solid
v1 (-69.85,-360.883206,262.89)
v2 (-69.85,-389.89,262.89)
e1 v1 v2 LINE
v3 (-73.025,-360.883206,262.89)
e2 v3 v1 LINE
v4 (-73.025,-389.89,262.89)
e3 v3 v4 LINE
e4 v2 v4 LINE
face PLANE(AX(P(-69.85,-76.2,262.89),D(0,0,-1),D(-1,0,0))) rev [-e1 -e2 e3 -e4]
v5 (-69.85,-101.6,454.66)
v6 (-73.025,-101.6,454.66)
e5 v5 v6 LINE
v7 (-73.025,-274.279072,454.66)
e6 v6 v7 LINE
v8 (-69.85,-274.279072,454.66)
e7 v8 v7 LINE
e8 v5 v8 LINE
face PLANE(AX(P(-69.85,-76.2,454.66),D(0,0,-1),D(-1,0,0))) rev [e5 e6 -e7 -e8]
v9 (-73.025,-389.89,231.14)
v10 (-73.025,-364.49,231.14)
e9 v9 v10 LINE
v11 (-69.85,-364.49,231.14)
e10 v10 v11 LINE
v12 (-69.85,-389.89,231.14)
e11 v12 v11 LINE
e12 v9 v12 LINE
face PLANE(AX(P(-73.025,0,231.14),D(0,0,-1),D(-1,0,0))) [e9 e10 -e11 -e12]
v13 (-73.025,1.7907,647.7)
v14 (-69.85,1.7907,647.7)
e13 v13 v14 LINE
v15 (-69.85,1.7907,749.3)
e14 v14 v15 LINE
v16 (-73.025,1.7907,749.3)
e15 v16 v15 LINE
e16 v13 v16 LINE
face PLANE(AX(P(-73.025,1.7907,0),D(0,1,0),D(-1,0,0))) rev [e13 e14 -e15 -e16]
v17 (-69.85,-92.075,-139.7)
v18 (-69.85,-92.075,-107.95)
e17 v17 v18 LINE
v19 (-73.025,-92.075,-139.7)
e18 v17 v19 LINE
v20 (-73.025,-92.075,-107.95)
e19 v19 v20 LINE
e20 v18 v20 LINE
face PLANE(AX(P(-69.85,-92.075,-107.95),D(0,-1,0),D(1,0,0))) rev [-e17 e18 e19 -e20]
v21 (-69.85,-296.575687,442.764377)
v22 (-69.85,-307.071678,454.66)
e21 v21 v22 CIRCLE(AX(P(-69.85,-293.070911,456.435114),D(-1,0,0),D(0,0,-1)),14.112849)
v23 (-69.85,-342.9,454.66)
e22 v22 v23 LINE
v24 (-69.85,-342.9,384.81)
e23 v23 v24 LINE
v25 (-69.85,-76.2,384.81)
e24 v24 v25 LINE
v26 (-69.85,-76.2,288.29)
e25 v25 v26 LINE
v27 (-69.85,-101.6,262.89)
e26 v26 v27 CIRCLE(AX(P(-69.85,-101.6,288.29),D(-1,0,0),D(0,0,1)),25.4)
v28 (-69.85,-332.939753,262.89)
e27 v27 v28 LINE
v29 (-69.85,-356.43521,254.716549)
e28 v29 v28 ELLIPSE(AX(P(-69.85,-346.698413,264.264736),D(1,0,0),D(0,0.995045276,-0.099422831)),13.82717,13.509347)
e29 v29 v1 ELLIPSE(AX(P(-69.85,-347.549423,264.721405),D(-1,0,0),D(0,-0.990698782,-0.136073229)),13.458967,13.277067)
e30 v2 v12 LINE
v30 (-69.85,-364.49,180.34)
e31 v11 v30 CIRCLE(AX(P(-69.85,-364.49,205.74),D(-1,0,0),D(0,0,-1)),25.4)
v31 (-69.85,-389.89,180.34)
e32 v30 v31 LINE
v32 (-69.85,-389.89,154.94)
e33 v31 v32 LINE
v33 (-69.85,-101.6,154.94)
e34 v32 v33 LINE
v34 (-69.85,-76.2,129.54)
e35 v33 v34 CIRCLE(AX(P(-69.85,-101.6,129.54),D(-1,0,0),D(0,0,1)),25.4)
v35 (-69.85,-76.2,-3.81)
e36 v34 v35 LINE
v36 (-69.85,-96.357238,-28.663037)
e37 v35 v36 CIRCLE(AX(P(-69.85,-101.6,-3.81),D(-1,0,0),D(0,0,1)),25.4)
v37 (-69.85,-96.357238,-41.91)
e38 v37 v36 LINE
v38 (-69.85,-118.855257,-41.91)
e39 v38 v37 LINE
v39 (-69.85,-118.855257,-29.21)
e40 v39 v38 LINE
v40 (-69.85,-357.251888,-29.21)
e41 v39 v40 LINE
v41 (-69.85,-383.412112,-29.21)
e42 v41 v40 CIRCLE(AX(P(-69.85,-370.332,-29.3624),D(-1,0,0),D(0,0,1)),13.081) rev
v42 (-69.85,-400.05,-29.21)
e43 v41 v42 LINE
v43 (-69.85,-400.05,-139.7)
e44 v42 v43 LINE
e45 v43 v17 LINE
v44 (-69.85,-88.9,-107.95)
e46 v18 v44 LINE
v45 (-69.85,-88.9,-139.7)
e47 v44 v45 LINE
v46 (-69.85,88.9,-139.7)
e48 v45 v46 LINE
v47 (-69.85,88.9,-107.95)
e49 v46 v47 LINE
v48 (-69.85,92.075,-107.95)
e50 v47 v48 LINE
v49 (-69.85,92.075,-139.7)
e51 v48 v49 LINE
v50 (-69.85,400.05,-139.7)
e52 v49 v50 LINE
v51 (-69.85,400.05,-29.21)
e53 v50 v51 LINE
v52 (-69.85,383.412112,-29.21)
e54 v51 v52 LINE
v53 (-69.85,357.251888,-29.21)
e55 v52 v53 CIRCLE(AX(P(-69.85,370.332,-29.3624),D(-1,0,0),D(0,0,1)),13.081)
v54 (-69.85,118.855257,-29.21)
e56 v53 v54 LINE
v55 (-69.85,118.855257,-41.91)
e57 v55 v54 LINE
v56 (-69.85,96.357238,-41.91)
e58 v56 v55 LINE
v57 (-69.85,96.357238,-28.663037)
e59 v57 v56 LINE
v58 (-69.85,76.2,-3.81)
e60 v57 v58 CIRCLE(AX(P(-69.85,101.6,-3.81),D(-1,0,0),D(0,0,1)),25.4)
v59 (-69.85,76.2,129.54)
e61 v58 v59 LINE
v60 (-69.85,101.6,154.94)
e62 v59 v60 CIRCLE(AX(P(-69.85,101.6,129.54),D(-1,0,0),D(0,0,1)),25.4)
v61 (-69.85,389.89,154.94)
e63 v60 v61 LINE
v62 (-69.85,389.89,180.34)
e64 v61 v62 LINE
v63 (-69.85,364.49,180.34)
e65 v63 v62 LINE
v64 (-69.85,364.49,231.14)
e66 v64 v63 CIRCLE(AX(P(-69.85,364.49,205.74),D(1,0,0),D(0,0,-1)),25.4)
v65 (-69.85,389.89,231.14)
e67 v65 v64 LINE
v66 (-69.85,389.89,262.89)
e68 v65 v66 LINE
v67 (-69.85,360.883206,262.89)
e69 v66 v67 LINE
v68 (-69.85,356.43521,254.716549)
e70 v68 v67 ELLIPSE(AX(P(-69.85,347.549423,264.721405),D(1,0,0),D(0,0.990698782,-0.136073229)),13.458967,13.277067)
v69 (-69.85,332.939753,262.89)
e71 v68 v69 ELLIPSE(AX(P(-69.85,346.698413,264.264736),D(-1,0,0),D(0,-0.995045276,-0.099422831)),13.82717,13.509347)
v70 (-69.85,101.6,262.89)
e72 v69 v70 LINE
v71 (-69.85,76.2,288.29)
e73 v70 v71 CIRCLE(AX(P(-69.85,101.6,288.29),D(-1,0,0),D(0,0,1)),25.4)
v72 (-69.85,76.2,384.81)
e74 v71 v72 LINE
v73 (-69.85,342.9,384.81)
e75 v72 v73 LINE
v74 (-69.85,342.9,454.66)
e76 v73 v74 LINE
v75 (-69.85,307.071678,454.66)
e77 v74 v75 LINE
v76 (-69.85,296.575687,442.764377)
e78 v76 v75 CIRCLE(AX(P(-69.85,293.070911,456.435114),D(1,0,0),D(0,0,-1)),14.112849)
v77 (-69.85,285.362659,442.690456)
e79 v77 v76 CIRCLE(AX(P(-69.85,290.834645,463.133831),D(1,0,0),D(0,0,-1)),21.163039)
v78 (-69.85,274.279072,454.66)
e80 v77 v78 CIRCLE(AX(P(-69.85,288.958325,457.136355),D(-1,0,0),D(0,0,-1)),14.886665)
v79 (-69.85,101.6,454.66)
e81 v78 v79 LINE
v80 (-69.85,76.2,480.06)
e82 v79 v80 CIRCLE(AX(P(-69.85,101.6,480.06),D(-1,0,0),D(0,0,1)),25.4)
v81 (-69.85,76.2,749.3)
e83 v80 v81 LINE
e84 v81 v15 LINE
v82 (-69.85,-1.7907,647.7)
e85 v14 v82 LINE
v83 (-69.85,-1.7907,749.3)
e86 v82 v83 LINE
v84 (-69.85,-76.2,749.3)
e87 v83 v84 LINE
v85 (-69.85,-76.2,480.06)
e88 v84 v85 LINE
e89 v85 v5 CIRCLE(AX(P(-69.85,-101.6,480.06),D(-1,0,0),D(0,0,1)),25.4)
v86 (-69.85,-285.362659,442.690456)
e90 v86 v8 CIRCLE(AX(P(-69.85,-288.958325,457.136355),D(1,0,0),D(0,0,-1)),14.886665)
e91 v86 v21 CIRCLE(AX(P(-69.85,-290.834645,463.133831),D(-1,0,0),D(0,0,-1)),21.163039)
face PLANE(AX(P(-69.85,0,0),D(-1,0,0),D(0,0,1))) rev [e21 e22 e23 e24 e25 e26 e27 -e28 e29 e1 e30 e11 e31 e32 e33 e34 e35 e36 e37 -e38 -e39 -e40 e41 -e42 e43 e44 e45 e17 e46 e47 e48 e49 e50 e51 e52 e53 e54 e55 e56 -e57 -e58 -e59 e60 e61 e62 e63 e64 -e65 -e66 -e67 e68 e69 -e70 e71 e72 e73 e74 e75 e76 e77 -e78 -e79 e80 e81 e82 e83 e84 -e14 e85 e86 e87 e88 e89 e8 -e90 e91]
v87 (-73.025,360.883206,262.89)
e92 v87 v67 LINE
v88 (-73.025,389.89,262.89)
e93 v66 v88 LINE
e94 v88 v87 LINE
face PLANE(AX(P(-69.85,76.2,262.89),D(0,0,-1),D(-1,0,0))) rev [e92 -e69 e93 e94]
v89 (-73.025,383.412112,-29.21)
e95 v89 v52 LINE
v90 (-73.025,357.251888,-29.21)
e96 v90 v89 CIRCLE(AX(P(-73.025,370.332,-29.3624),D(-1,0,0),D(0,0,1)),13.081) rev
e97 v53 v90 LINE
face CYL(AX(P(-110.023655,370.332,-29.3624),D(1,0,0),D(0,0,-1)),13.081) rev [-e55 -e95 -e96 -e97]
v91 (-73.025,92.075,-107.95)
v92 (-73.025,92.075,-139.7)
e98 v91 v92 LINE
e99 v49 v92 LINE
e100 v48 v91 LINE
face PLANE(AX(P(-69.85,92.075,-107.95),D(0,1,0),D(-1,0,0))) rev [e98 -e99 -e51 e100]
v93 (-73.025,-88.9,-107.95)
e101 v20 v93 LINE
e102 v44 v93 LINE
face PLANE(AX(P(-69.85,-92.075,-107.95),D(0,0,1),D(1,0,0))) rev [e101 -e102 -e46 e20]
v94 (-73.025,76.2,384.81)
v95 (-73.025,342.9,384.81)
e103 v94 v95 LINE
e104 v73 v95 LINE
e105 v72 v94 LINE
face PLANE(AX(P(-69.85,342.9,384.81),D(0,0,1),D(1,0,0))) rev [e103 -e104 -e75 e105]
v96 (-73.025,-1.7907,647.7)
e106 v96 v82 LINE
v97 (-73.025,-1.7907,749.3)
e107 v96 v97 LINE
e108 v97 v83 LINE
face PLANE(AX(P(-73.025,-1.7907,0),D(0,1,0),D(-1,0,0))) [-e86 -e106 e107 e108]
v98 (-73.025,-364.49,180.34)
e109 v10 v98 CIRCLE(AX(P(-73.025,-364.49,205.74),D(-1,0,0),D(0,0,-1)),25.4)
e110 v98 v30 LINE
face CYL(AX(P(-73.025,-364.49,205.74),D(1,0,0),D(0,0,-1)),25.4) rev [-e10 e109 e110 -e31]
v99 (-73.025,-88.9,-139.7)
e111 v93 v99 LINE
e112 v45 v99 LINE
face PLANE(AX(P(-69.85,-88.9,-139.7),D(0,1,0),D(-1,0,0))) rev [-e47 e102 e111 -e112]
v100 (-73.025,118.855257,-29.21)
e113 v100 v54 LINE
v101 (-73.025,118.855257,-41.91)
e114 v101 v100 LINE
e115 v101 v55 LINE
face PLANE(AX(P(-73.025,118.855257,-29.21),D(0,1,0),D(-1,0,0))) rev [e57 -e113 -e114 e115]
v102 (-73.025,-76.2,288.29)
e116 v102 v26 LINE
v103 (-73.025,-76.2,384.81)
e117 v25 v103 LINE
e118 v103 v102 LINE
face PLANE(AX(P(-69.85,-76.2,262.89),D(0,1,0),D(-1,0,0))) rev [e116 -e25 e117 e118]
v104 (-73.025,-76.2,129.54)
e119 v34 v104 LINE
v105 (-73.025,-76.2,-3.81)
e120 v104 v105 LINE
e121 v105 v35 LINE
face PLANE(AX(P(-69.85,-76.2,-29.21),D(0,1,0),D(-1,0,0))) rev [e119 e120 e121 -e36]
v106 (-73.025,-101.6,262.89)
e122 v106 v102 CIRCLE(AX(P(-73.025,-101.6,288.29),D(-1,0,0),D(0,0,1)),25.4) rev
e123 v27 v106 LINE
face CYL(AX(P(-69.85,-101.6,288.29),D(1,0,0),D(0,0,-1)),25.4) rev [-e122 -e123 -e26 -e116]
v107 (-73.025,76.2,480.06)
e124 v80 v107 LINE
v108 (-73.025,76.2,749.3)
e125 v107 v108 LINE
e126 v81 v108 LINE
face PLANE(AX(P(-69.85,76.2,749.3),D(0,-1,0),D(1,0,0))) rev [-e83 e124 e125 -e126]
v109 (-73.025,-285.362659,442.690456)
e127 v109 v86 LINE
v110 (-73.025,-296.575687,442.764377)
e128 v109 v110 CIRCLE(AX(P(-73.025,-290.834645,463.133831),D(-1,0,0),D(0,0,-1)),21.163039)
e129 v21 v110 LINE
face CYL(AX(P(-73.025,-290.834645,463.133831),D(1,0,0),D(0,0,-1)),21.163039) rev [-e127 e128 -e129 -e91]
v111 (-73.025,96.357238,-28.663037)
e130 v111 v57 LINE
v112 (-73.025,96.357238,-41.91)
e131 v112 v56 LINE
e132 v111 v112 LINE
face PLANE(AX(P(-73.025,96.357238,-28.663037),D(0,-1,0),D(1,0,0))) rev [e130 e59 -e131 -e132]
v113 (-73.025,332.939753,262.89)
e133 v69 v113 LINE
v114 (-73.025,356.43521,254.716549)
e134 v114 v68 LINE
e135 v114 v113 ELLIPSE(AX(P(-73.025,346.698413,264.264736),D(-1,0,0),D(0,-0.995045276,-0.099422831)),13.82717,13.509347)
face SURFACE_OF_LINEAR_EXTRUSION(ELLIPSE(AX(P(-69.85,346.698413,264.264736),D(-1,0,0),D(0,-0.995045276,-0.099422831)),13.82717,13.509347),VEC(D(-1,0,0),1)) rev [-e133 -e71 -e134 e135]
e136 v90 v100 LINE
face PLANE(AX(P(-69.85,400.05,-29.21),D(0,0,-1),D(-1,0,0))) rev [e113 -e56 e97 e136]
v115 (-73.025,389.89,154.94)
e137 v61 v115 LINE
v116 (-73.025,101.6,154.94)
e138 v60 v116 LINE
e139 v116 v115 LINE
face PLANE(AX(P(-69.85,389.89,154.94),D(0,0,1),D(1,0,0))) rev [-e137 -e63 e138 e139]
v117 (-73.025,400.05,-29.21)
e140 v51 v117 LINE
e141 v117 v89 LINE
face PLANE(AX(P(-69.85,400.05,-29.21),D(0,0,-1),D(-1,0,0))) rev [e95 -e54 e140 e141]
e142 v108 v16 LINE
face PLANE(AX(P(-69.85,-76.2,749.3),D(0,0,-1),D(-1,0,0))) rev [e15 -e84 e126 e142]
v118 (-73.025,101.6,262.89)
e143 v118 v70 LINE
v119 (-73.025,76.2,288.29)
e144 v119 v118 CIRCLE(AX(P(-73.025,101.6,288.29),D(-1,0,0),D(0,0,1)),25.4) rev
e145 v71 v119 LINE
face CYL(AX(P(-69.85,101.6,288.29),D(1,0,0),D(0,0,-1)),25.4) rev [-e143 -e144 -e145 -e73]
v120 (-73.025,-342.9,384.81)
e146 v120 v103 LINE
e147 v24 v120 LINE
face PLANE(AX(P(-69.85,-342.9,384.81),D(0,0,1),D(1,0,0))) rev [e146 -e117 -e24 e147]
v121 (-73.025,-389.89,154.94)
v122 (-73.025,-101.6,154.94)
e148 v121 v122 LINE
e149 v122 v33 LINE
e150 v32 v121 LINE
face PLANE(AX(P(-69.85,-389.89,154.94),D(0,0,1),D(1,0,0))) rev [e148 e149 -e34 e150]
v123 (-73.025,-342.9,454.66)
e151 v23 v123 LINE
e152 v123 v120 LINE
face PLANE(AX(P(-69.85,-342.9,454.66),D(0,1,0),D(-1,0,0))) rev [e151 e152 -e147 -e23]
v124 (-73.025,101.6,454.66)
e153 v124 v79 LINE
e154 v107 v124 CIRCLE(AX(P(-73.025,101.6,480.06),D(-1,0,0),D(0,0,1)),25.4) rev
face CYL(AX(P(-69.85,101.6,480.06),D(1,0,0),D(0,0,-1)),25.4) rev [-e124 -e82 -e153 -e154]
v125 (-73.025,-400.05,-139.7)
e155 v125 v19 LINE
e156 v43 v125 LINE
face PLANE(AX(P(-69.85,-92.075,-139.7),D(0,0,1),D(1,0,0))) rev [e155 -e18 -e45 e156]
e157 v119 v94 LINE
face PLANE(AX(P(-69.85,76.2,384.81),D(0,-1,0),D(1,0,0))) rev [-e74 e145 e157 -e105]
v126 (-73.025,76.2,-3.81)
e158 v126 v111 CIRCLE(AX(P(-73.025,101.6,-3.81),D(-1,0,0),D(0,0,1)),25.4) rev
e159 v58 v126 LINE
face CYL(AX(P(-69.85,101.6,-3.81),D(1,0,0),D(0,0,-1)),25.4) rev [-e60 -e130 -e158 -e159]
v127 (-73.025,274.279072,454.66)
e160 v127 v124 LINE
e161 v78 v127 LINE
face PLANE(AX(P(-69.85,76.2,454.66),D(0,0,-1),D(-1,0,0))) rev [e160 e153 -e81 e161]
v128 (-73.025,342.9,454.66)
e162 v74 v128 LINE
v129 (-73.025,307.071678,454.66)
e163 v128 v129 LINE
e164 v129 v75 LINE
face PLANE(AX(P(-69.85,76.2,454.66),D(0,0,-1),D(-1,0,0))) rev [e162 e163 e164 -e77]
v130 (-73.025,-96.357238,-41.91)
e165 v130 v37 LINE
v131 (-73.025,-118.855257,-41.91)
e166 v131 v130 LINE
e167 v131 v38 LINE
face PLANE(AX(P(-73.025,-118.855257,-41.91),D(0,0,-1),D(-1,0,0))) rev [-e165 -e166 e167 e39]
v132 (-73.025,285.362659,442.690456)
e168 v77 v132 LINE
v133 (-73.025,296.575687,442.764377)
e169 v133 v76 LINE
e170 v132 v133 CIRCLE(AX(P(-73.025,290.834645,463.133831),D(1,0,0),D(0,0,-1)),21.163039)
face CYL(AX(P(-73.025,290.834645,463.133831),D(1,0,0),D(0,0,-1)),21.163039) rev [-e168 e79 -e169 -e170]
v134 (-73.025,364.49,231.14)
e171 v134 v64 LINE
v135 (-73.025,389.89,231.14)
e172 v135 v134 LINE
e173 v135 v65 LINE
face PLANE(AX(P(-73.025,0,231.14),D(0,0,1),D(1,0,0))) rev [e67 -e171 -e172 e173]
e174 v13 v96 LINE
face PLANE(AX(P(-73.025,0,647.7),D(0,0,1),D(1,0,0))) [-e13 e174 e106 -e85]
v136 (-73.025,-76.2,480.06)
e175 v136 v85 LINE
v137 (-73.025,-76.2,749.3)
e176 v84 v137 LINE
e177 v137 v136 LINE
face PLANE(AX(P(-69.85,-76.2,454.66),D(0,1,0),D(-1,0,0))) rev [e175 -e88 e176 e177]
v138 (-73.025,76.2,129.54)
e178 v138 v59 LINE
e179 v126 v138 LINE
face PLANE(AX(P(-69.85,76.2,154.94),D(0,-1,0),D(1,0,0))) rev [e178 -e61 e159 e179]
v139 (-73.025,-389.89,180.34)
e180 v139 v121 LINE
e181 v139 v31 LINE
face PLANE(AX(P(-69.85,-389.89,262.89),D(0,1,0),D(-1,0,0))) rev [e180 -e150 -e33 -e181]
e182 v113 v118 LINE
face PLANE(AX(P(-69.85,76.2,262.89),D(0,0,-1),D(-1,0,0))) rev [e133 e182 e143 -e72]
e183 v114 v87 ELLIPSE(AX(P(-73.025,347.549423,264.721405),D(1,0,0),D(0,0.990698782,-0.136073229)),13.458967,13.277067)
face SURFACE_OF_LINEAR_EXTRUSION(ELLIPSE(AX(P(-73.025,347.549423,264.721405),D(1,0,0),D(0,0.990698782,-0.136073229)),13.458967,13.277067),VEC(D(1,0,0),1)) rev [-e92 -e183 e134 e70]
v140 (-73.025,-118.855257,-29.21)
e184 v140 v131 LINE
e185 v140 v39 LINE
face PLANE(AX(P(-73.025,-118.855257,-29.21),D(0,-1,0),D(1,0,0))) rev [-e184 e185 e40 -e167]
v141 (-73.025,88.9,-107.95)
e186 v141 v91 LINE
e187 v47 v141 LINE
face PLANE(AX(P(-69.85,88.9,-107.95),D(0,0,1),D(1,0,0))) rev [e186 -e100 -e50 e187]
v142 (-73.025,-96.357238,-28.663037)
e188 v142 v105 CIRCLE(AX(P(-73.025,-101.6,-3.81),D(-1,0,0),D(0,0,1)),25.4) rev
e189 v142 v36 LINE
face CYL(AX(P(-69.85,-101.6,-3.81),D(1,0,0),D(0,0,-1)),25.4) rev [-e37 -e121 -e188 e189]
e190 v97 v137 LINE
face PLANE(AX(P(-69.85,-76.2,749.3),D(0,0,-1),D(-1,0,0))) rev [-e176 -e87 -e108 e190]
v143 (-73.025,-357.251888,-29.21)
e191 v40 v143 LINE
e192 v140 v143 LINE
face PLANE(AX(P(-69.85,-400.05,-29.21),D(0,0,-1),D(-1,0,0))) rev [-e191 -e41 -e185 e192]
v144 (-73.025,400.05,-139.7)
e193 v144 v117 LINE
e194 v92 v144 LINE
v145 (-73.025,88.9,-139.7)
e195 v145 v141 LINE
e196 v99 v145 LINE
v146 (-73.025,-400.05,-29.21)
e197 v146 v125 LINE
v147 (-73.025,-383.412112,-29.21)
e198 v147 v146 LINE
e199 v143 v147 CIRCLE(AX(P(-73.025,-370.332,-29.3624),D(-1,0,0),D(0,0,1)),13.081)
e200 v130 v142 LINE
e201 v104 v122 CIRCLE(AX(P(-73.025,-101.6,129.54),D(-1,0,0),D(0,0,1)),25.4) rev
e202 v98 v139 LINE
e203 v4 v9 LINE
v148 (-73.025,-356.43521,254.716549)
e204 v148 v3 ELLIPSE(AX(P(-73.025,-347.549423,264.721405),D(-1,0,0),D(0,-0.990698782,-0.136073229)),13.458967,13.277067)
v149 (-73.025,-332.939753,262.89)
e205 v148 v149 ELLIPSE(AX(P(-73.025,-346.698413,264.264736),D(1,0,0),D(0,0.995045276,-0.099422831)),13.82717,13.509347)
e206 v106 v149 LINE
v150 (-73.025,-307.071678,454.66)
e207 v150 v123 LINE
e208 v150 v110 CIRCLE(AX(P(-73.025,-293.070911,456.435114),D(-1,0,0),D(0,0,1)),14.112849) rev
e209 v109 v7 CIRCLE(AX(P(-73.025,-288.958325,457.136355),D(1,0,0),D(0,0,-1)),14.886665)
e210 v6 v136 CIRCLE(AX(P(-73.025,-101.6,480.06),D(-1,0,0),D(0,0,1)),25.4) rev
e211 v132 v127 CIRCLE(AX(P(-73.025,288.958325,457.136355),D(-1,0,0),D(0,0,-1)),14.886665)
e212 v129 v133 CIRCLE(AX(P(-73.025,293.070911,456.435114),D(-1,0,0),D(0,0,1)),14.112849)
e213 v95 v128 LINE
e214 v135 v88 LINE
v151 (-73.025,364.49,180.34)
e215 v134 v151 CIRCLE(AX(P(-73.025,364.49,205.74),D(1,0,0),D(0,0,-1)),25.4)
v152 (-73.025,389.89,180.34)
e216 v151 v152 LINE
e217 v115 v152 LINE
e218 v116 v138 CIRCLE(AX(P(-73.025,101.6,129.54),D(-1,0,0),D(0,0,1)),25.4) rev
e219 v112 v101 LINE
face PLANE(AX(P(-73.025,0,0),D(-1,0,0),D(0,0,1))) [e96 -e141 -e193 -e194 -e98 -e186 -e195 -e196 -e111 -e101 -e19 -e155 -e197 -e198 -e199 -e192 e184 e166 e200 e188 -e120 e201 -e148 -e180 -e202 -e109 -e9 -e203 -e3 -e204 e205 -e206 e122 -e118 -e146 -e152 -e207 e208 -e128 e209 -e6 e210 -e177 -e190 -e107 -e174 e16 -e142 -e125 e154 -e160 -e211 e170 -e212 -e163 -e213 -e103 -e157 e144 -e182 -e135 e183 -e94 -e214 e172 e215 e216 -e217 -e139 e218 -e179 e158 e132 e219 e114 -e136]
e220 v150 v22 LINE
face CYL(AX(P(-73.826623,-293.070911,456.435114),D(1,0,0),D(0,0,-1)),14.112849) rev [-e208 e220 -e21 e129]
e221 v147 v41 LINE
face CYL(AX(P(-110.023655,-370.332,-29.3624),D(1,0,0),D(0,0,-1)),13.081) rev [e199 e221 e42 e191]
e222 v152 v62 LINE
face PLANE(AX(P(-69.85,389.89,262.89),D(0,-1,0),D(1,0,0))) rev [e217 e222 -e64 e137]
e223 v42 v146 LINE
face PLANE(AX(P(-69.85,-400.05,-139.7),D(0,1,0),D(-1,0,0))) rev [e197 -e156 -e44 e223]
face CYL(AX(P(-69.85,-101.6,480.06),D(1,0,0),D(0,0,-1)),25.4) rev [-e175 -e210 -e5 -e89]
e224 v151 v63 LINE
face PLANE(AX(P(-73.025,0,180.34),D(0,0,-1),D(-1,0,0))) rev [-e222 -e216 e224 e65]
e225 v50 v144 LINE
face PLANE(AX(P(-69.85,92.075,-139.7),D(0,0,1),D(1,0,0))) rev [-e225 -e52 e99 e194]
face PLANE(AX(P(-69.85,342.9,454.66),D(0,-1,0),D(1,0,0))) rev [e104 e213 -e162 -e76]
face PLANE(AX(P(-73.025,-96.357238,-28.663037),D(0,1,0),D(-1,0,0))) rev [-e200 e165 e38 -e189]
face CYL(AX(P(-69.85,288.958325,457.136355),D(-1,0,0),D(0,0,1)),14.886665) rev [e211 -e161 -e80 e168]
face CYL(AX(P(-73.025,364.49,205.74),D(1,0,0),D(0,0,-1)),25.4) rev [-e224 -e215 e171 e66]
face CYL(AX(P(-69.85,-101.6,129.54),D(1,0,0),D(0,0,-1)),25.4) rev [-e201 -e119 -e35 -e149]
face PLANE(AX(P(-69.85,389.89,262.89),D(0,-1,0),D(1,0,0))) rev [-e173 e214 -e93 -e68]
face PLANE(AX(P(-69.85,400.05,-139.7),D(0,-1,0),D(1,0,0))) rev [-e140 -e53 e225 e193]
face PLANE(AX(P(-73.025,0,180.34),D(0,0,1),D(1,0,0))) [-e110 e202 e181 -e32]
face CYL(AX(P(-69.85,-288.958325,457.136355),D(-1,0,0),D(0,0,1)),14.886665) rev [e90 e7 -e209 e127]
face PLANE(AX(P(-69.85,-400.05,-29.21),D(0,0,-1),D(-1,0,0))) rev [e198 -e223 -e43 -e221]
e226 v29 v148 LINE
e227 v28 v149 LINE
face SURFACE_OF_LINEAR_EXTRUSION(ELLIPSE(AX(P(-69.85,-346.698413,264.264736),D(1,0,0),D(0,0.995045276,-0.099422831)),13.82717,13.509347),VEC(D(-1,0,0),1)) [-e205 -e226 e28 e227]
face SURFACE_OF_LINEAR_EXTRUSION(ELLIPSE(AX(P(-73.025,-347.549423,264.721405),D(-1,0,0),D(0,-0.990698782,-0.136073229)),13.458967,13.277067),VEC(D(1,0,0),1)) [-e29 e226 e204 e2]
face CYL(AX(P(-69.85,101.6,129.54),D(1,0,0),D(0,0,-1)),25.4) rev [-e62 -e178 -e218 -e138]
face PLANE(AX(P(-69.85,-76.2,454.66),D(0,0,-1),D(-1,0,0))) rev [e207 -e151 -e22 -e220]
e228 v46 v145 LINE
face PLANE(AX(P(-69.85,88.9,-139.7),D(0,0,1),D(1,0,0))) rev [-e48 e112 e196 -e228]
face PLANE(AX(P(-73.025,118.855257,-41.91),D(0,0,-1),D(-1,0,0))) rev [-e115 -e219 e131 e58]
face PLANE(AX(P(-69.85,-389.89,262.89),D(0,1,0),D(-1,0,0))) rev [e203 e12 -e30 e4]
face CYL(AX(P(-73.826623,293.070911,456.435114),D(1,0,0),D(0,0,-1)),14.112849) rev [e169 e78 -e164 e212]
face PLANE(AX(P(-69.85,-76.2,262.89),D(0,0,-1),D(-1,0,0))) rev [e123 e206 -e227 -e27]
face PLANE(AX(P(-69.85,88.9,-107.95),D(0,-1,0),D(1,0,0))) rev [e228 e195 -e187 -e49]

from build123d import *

# Parameters (mm, degrees)
BOSS_EXTRUDE1_DEPTH = 1.5875
SKETCH2_R           = 13.081
CUT_EXTRUDE1_DEPTH  = 282.7782
CUT_EXTRUDE2_REACH  = 907.396
SKETCH3_R           = 13.081
SKETCH5_RX          = 13.458967046
SKETCH5_RY          = 13.27706685
CUT_EXTRUDE3_DEPTH  = 850.411898389
SKETCH7_RX          = 13.827169688
SKETCH7_RY          = 13.509347203
CUT_EXTRUDE4_DEPTH  = 850.411898525
SURFACECUT1_ANGLE   = 12.730551
CUT_EXTRUDE13_DEPTH = 850.411898527
CUT_EXTRUDE14_START = -3.175
CUT_EXTRUDE14_DEPTH = 3.175
CUT_EXTRUDE15_DEPTH = 850.411898527
CUT_EXTRUDE16_DEPTH = 850.411898527
FILLET1_R           = 25.4
SKETCH28_W          = 101.6
SKETCH28_H          = 1.7907
CUT_EXTRUDE17_DEPTH = 850.411898527
CUT_EXTRUDE18_DEPTH = 850.411898527
CUT_EXTRUDE19_DEPTH = 850.411898527


# Read off the part's stored shape, not the designer's step: SurfaceCut1, Cut-Extrude14
with BuildPart() as part:
    # Sketch1 → Boss-Extrude1 (new, symmetric)
    with BuildSketch(Plane(origin=(-71.4375, 0, 0), x_dir=(0, 0, -1), z_dir=(1, 0, 0))):
        Polygon((139.7, -400.05), (29.21, -400.05), (29.21, -76.2), (-154.94, -76.2), (-154.94, -389.89), (-262.89, -389.89), (-262.89, -76.2), (-384.81, -76.2), (-384.81, -342.9), (-454.66, -342.9), (-454.66, -76.2), (-749.3, -76.2), (-749.3, 76.2), (-454.66, 76.2), (-454.66, 342.9), (-384.81, 342.9), (-384.81, 76.2), (-262.89, 76.2), (-262.89, 389.89), (-154.94, 389.89), (-154.94, 76.2), (29.21, 76.2), (29.21, 400.05), (139.7, 400.05), (139.7, 92.075), (107.95, 92.075), (107.95, 88.9), (139.7, 88.9), (139.7, -88.9), (107.95, -88.9), (107.95, -92.075), (139.7, -92.075), align=None)
    extrude(amount=BOSS_EXTRUDE1_DEPTH, both=True)

    # Sketch2 → Cut-Extrude1 (cut)
    with BuildSketch(Plane(origin=(209.7532, 370.332, -29.3624), x_dir=(0, 0, -1), z_dir=(1, 0, 0))):
        Circle(SKETCH2_R)
    cut_extrude1 = extrude(amount=-CUT_EXTRUDE1_DEPTH, mode=Mode.SUBTRACT)

    # Cut-Extrude2: up to this plane
    cut_extrude2_end = Plane(origin=(-73.025, 0, 0), z_dir=(-1, 0, 0))
    # Sketch3 → Cut-Extrude2 (cut, up to the surface)
    with BuildSketch(Plane(origin=(4.654591859, 367.519252147, 275.4376), x_dir=(0.13291538281760473, 0.03562595760229639, -0.9904868965086662), z_dir=(0.9567163781525703, 0.25643335182849597, 0.13760707774177544)), mode=Mode.PRIVATE) as cut_extrude2_sk1:
        Circle(SKETCH3_R)
    cut_extrude2_tool1 = split(extrude(cut_extrude2_sk1.sketch, amount=-CUT_EXTRUDE2_REACH, mode=Mode.PRIVATE), bisect_by=cut_extrude2_end, keep=Keep.BOTH, mode=Mode.PRIVATE)
    cut_extrude2 = cut_extrude2_tool1.solids().sort_by_distance((4.654592, 367.519252, 275.4376))[0]
    add(cut_extrude2, mode=Mode.SUBTRACT)

    # Sketch5 → Cut-Extrude3 (cut, through all)
    with BuildSketch(Plane(origin=(-69.85, 0, 0), x_dir=(0, 0, -1), z_dir=(1, 0, 0))):
        with Locations(Location((-264.721405109, 347.549423415), (0, 0, 82.179315893))):
            Ellipse(SKETCH5_RX, SKETCH5_RY)
    cut_extrude3 = extrude(amount=-CUT_EXTRUDE3_DEPTH, mode=Mode.SUBTRACT)

    # Sketch7 → Cut-Extrude4 (cut, through all)
    with BuildSketch(Plane.ZY.offset(73.025)):
        with Locations(Location((264.264736359, 346.698412696), (0, 0, -95.705935517))):
            Ellipse(SKETCH7_RX, SKETCH7_RY)
    cut_extrude4 = extrude(amount=-CUT_EXTRUDE4_DEPTH, mode=Mode.SUBTRACT)

    # SurfaceCut1 outline → SurfaceCut1 (revolve, cut)
    with BuildSketch(Plane(origin=(-25.4, 215.408274925, 0), x_dir=(-0.43753517000423214, 0.899201298380606, 0), z_dir=(0.899201298380606, 0.43753517000423214, 0))):
        with BuildLine():
            ThreePointArc((76.208166822, 454.660000025), (88.899999997, 442.415379638), (101.591833177, 454.660000021))
            Line((101.591833177, 454.660000021), (76.208166822, 454.660000025))
        make_face()
    surfacecut1 = revolve(axis=Axis((-25.4, 215.408274925, 0), (0, 0, 1)), revolution_arc=SURFACECUT1_ANGLE, mode=Mode.SUBTRACT)

    # Sketch21 → Cut-Extrude13 (cut, through all)
    with BuildSketch(Plane.ZY.offset(73.025)):
        with BuildLine():
            Line((454.66, 303.637577447), (454.66, 274.279071706))
            ThreePointArc((454.66, 274.279071706), (442.249689548, 288.958324577), (454.66, 303.637577447))
        make_face()
    cut_extrude13 = extrude(amount=-CUT_EXTRUDE13_DEPTH, mode=Mode.SUBTRACT)

    # Cut-Extrude14 outline → Cut-Extrude14 (cut)
    with BuildSketch(Plane(origin=(-69.85, 0, 0), x_dir=(0, 0, -1), z_dir=(1, 0, 0)).offset(CUT_EXTRUDE14_START)):
        with BuildLine():
            Line((-454.66, 291.370782877), (-442.446465515, 291.370782877))
            add(Edge.make_bspline(
                [(-442.446465515, 291.370782877), (-442.305604528, 293.829318521), (-442.944960374, 298.079765742), (-445.927339463, 302.763682225), (-449.764908378, 305.786294337), (-452.799544613, 306.691151874), (-454.66, 306.759783223)],
                knots=[0, 0, 0, 0, 0.33604966, 0.578754716, 0.743869723, 1, 1, 1, 1], degree=3))
            Line((-454.66, 306.759783223), (-454.66, 291.370782877))
        make_face()
    cut_extrude14 = extrude(amount=CUT_EXTRUDE14_DEPTH, mode=Mode.SUBTRACT)

    # Sketch25 → Cut-Extrude15 (cut, through all)
    with BuildSketch(Plane(origin=(-69.85, 0, 0), x_dir=(0, 0, -1), z_dir=(1, 0, 0))):
        with BuildLine():
            Line((-442.434347234, 291.295796674), (-456.435114382, 293.070911057))
            Line((-456.435114382, 293.070911057), (-454.66, 307.071678205))
            ThreePointArc((-454.66, 307.071678205), (-445.279881573, 301.715753032), (-442.434347234, 291.295796674))
        make_face()
    cut_extrude15 = extrude(amount=-CUT_EXTRUDE15_DEPTH, mode=Mode.SUBTRACT)

    # Sketch27 → Cut-Extrude16 (cut, through all)
    with BuildSketch(Plane(origin=(-69.85, 0, 0), x_dir=(0, 0, -1), z_dir=(1, 0, 0))):
        with BuildLine():
            Line((-443.216925762, 283.679849678), (-443.400538268, 298.481302661))
            ThreePointArc((-443.400538268, 298.481302661), (-441.972420297, 291.09715316), (-443.216925762, 283.679849678))
        make_face()
    cut_extrude16 = extrude(amount=-CUT_EXTRUDE16_DEPTH, mode=Mode.SUBTRACT)

    # Mirror1: Cut-Extrude1, Cut-Extrude2, Cut-Extrude3, Cut-Extrude4, SurfaceCut1, Cut-Extrude13, Cut-Extrude14, Cut-Extrude15, Cut-Extrude16 across plane
    add(cut_extrude1.mirror(Plane.ZX), mode=Mode.SUBTRACT)
    add(cut_extrude2.mirror(Plane.ZX), mode=Mode.SUBTRACT)
    add(cut_extrude3.mirror(Plane.ZX), mode=Mode.SUBTRACT)
    add(cut_extrude4.mirror(Plane.ZX), mode=Mode.SUBTRACT)
    add(surfacecut1.mirror(Plane.ZX), mode=Mode.SUBTRACT)
    add(cut_extrude13.mirror(Plane.ZX), mode=Mode.SUBTRACT)
    add(cut_extrude14.mirror(Plane.ZX), mode=Mode.SUBTRACT)
    add(cut_extrude15.mirror(Plane.ZX), mode=Mode.SUBTRACT)
    add(cut_extrude16.mirror(Plane.ZX), mode=Mode.SUBTRACT)

    # Fillet1
    fillet1_edges = [part.edges().sort_by_distance(p)[0] for p in [
        (-71.4375, -76.2, -29.21),
        (-71.4375, -76.2, 154.94),
        (-71.4375, -76.2, 262.89),
        (-71.4375, -76.2, 454.66),
        (-71.4375, 76.2, 454.66),
        (-71.4375, 76.2, 262.89),
        (-71.4375, 76.2, 154.94),
        (-71.4375, 76.2, -29.21),
    ]]
    fillet(fillet1_edges, radius=FILLET1_R)

    # Sketch28 → Cut-Extrude17 (cut, through all)
    with BuildSketch(Plane(origin=(-69.85, 0, 0), x_dir=(0, 0, -1), z_dir=(1, 0, 0))):
        with Locations((-698.5, -0.89535)):
            Rectangle(SKETCH28_W, SKETCH28_H)
        with Locations((-698.5, 0.89535)):
            Rectangle(SKETCH28_W, SKETCH28_H)
    extrude(amount=-CUT_EXTRUDE17_DEPTH, mode=Mode.SUBTRACT)

    # Sketch29 → Cut-Extrude18 (cut, through all)
    with BuildSketch(Plane(origin=(-69.85, 0, 0), x_dir=(0, 0, -1), z_dir=(1, 0, 0))):
        Polygon((29.21, 118.85525736), (41.91, 118.85525736), (41.91, 96.357238024), (28.663036975, 96.357238024), align=None)
        Polygon((29.21, -118.85525736), (41.91, -118.85525736), (41.91, -96.357238024), (28.663036975, -96.357238024), align=None)
    extrude(amount=-CUT_EXTRUDE18_DEPTH, mode=Mode.SUBTRACT)

    # Sketch30 → Cut-Extrude19 (cut, through all)
    with BuildSketch(Plane(origin=(-69.85, 0, 0), x_dir=(0, 0, -1), z_dir=(1, 0, 0))):
        with BuildLine():
            Line((-231.14, 389.89), (-231.14, 364.49))
            ThreePointArc((-231.14, 364.49), (-205.74, 339.09), (-180.34, 364.49))
            Line((-180.34, 364.49), (-180.34, 389.89))
            Line((-180.34, 389.89), (-231.14, 389.89))
        make_face()
    cut_extrude19 = extrude(amount=-CUT_EXTRUDE19_DEPTH, mode=Mode.SUBTRACT)

    # Mirror2: Cut-Extrude19 across plane
    add(cut_extrude19.mirror(Plane.ZX), mode=Mode.SUBTRACT)


solid = part.part
